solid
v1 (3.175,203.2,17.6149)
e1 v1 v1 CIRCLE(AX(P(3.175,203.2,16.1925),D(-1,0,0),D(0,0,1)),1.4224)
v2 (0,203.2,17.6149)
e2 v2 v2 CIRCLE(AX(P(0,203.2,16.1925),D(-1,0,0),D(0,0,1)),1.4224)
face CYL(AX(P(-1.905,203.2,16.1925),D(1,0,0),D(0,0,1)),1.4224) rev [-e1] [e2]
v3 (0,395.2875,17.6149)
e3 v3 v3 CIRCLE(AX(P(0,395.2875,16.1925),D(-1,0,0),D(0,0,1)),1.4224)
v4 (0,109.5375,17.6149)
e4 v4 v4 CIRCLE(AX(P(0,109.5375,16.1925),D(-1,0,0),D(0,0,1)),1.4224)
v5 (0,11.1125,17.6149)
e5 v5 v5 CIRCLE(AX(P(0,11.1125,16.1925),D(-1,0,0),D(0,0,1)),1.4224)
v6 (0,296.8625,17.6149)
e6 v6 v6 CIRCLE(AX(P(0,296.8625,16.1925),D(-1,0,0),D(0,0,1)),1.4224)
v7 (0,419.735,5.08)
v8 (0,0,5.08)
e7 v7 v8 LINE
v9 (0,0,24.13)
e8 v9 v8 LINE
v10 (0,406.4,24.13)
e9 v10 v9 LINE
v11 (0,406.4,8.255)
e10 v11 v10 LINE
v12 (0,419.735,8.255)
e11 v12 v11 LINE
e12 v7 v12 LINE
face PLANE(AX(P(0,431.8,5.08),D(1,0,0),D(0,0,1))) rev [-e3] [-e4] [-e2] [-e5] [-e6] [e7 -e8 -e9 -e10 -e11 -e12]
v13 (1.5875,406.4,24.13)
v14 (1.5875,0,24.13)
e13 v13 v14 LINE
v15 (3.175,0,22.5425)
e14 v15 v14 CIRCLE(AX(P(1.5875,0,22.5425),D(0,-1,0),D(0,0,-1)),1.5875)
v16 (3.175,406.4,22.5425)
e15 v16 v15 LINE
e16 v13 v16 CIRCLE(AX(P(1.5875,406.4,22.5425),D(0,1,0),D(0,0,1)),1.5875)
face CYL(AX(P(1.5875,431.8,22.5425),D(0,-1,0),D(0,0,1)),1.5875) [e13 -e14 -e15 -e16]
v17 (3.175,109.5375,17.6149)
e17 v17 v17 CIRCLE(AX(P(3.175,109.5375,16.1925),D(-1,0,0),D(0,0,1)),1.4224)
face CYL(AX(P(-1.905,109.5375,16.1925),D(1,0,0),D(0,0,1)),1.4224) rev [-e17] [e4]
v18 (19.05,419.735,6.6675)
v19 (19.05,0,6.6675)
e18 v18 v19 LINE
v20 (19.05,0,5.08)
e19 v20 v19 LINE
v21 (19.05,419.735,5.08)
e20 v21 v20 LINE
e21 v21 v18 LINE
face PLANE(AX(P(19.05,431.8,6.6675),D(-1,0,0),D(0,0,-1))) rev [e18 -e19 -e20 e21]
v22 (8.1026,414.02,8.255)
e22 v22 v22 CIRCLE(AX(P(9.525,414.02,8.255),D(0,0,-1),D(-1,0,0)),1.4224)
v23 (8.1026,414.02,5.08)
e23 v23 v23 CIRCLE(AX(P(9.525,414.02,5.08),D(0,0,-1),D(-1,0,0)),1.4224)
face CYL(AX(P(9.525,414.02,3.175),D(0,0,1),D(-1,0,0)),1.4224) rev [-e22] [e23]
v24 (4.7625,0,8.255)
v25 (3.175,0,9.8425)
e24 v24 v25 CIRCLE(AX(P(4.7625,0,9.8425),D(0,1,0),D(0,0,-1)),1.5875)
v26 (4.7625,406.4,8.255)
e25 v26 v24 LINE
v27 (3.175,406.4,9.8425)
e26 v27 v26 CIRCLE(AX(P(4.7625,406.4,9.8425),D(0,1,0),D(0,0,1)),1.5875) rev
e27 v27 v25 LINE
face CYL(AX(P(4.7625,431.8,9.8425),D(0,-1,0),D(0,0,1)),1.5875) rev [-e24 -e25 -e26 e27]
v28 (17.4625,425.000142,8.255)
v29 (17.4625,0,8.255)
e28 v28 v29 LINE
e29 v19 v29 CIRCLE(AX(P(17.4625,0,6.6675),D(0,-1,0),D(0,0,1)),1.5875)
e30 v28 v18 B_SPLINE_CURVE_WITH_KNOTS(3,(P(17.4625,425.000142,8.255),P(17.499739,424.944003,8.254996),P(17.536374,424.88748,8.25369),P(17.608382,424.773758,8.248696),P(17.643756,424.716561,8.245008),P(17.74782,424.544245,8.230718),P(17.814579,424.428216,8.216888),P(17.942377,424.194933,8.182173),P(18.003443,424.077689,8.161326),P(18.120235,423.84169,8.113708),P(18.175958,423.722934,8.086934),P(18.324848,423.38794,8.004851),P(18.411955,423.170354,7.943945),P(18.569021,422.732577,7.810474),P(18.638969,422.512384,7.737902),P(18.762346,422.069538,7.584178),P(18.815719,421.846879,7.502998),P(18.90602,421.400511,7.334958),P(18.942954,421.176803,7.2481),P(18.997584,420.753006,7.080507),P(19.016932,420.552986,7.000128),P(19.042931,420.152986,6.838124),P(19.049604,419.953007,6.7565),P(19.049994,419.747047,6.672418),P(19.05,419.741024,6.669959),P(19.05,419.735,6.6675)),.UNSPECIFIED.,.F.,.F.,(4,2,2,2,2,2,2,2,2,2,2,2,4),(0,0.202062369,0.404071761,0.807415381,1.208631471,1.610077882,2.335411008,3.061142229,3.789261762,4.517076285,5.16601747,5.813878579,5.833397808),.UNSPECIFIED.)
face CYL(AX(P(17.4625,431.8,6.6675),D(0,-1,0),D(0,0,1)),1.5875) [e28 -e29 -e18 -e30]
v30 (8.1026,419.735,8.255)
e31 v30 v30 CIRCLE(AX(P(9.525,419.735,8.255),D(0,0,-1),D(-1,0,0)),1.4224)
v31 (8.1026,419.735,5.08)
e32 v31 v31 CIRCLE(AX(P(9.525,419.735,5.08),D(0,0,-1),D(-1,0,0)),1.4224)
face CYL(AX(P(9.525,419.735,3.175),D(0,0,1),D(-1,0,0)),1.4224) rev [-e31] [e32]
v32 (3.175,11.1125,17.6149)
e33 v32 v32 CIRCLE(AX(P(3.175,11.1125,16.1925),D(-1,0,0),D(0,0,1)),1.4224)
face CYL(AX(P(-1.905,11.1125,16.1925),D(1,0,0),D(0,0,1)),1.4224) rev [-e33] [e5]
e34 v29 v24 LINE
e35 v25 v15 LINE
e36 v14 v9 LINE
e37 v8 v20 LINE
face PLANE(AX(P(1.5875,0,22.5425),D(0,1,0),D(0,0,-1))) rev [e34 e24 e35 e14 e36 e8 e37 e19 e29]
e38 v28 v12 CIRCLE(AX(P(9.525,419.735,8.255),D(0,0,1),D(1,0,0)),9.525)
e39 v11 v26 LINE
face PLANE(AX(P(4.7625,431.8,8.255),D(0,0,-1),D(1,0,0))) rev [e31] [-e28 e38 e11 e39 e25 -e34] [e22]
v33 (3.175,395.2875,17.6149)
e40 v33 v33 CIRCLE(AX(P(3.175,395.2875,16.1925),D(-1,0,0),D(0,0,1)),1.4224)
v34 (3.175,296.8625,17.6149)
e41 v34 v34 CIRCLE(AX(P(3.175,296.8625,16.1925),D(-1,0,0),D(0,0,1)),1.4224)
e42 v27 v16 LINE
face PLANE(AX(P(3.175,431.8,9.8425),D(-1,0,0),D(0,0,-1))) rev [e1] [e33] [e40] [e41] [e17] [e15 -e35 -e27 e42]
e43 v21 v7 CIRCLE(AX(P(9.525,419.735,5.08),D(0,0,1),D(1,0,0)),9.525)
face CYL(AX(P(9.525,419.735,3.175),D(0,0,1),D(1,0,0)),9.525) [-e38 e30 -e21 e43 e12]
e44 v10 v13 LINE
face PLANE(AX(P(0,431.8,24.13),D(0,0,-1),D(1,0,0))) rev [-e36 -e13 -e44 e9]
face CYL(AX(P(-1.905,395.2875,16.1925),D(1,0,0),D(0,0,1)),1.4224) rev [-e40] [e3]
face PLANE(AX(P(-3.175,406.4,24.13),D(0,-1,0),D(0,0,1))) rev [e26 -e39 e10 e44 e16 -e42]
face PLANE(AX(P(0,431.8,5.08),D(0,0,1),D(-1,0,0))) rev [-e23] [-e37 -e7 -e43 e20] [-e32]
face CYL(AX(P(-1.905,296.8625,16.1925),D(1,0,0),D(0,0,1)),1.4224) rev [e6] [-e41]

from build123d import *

# Parameters (mm, degrees)
BOSS_EXTRUDE1_DEPTH = 431.8
SKETCH4_W           = 15.875
SKETCH4_H           = 25.4
CUT_EXTRUDE1_DEPTH  = 6.35
SKETCH5_W           = 1.5875
SKETCH5_H           = 25.4
CUT_EXTRUDE2_DEPTH  = 6.35
SKETCH6_R           = 1.4224
CUT_EXTRUDE3_DEPTH  = 5.08
CUT_EXTRUDE4_START  = -2.54
CUT_EXTRUDE4_DEPTH  = 2.54
SKETCH8_R           = 1.4224
CUT_EXTRUDE5_DEPTH  = 5.08
SKETCH9_W           = 28.861002292
SKETCH9_H           = 547.524656259
CUT_EXTRUDE6_DEPTH  = 30.48
CUT_EXTRUDE7_DEPTH  = 5.08


with BuildPart() as part:
    # Sketch2 → Boss-Extrude1 (new body)
    with BuildSketch(Plane(origin=(0, 0, 0), x_dir=(1, 0, 0), z_dir=(0, 1, 0))):
        with BuildLine():
            Line((0, 0), (19.05, 0))
            Line((19.05, 0), (19.05, 1.5875))
            ThreePointArc((19.05, 1.5875), (18.585032015, 2.710032015), (17.4625, 3.175))
            Line((17.4625, 3.175), (4.7625, 3.175))
            ThreePointArc((4.7625, 3.175), (3.639967985, 3.639967985), (3.175, 4.7625))
            Line((3.175, 4.7625), (3.175, 17.4625))
            ThreePointArc((3.175, 17.4625), (2.710032015, 18.585032015), (1.5875, 19.05))
            Line((1.5875, 19.05), (0, 19.05))
            Line((0, 19.05), (0, 0))
        make_face()
    extrude(amount=BOSS_EXTRUDE1_DEPTH)

    # Sketch4 → Cut-Extrude1 (cut)
    with BuildSketch(Plane(origin=(3.175, 0, 0), x_dir=(0, 0, -1), z_dir=(1, 0, 0))):
        with Locations((11.1125, 419.1)):
            Rectangle(SKETCH4_W, SKETCH4_H)
    extrude(amount=-CUT_EXTRUDE1_DEPTH, mode=Mode.SUBTRACT)

    # Sketch5 → Cut-Extrude2 (cut)
    with BuildSketch(Plane.ZY.offset(-3.175)):
        with Locations((-3.96875, 419.1)):
            Rectangle(SKETCH5_W, SKETCH5_H)
    extrude(amount=-CUT_EXTRUDE2_DEPTH, mode=Mode.SUBTRACT)

    # Sketch6 → Cut-Extrude3 (cut)
    with BuildSketch(Plane(origin=(3.175, 0, 0), x_dir=(0, 0, -1), z_dir=(1, 0, 0))):
        with Locations((11.1125, 109.5375)):
            Circle(SKETCH6_R)
        with Locations((11.1125, 203.2)):
            Circle(SKETCH6_R)
        with Locations((11.1125, 296.8625)):
            Circle(SKETCH6_R)
        with Locations((11.1125, 11.1125)):
            Circle(SKETCH6_R)
        with Locations((11.1125, 395.2875)):
            Circle(SKETCH6_R)
    extrude(amount=-CUT_EXTRUDE3_DEPTH, mode=Mode.SUBTRACT)

    # Sketch7 → Cut-Extrude4 (cut)
    with BuildSketch(Plane(origin=(0, 431.8, 0), x_dir=(1, 0, 0), z_dir=(0, 1, 0)).offset(CUT_EXTRUDE4_START)):
        with BuildLine():
            Line((17.4625, 3.175), (0, 3.175))
            Line((0, 3.175), (0, 0))
            Line((0, 0), (19.05, 0))
            Line((19.05, 0), (19.05, 1.5875))
            ThreePointArc((19.05, 1.5875), (18.585032015, 2.710032015), (17.4625, 3.175))
        make_face()
    extrude(amount=CUT_EXTRUDE4_DEPTH, mode=Mode.SUBTRACT)

    # Sketch8 → Cut-Extrude5 (cut)
    with BuildSketch(Plane(origin=(0, 0, -3.175), x_dir=(-1, 0, 0), z_dir=(0, 0, -1))):
        with Locations((-9.525, 419.735)):
            Circle(SKETCH8_R)
        with Locations((-9.525, 414.02)):
            Circle(SKETCH8_R)
    extrude(amount=-CUT_EXTRUDE5_DEPTH, mode=Mode.SUBTRACT)


with BuildPart() as body_2:
    # Mirror3: mirrored copy
    add(part.part.mirror(Plane.XY.offset(2.54)))

    # Sketch10 → Cut-Extrude7 (cut)
    with BuildSketch(Plane.XY.offset(8.255)):
        with BuildLine():
            Line((19.05, 419.735), (19.05, 429.26))
            Line((19.05, 429.26), (9.525, 429.26))
            ThreePointArc((9.525, 429.26), (16.260192091, 426.470192091), (19.05, 419.735))
        make_face()
        with BuildLine():
            ThreePointArc((0, 419.735), (2.789807909, 426.470192091), (9.525, 429.26))
            Line((9.525, 429.26), (0, 429.26))
            Line((0, 429.26), (0, 419.735))
        make_face()
    extrude(amount=-CUT_EXTRUDE7_DEPTH, mode=Mode.SUBTRACT)


with BuildPart() as part_1:
    add(part.part)

    # Sketch9 → Cut-Extrude6 (cut)
    with BuildSketch(Plane.XY.offset(2.54)):
        with Locations((7.805746781, 195.778589833)):
            Rectangle(SKETCH9_W, SKETCH9_H)
    extrude(amount=-CUT_EXTRUDE6_DEPTH, mode=Mode.SUBTRACT)


solid = body_2.part
